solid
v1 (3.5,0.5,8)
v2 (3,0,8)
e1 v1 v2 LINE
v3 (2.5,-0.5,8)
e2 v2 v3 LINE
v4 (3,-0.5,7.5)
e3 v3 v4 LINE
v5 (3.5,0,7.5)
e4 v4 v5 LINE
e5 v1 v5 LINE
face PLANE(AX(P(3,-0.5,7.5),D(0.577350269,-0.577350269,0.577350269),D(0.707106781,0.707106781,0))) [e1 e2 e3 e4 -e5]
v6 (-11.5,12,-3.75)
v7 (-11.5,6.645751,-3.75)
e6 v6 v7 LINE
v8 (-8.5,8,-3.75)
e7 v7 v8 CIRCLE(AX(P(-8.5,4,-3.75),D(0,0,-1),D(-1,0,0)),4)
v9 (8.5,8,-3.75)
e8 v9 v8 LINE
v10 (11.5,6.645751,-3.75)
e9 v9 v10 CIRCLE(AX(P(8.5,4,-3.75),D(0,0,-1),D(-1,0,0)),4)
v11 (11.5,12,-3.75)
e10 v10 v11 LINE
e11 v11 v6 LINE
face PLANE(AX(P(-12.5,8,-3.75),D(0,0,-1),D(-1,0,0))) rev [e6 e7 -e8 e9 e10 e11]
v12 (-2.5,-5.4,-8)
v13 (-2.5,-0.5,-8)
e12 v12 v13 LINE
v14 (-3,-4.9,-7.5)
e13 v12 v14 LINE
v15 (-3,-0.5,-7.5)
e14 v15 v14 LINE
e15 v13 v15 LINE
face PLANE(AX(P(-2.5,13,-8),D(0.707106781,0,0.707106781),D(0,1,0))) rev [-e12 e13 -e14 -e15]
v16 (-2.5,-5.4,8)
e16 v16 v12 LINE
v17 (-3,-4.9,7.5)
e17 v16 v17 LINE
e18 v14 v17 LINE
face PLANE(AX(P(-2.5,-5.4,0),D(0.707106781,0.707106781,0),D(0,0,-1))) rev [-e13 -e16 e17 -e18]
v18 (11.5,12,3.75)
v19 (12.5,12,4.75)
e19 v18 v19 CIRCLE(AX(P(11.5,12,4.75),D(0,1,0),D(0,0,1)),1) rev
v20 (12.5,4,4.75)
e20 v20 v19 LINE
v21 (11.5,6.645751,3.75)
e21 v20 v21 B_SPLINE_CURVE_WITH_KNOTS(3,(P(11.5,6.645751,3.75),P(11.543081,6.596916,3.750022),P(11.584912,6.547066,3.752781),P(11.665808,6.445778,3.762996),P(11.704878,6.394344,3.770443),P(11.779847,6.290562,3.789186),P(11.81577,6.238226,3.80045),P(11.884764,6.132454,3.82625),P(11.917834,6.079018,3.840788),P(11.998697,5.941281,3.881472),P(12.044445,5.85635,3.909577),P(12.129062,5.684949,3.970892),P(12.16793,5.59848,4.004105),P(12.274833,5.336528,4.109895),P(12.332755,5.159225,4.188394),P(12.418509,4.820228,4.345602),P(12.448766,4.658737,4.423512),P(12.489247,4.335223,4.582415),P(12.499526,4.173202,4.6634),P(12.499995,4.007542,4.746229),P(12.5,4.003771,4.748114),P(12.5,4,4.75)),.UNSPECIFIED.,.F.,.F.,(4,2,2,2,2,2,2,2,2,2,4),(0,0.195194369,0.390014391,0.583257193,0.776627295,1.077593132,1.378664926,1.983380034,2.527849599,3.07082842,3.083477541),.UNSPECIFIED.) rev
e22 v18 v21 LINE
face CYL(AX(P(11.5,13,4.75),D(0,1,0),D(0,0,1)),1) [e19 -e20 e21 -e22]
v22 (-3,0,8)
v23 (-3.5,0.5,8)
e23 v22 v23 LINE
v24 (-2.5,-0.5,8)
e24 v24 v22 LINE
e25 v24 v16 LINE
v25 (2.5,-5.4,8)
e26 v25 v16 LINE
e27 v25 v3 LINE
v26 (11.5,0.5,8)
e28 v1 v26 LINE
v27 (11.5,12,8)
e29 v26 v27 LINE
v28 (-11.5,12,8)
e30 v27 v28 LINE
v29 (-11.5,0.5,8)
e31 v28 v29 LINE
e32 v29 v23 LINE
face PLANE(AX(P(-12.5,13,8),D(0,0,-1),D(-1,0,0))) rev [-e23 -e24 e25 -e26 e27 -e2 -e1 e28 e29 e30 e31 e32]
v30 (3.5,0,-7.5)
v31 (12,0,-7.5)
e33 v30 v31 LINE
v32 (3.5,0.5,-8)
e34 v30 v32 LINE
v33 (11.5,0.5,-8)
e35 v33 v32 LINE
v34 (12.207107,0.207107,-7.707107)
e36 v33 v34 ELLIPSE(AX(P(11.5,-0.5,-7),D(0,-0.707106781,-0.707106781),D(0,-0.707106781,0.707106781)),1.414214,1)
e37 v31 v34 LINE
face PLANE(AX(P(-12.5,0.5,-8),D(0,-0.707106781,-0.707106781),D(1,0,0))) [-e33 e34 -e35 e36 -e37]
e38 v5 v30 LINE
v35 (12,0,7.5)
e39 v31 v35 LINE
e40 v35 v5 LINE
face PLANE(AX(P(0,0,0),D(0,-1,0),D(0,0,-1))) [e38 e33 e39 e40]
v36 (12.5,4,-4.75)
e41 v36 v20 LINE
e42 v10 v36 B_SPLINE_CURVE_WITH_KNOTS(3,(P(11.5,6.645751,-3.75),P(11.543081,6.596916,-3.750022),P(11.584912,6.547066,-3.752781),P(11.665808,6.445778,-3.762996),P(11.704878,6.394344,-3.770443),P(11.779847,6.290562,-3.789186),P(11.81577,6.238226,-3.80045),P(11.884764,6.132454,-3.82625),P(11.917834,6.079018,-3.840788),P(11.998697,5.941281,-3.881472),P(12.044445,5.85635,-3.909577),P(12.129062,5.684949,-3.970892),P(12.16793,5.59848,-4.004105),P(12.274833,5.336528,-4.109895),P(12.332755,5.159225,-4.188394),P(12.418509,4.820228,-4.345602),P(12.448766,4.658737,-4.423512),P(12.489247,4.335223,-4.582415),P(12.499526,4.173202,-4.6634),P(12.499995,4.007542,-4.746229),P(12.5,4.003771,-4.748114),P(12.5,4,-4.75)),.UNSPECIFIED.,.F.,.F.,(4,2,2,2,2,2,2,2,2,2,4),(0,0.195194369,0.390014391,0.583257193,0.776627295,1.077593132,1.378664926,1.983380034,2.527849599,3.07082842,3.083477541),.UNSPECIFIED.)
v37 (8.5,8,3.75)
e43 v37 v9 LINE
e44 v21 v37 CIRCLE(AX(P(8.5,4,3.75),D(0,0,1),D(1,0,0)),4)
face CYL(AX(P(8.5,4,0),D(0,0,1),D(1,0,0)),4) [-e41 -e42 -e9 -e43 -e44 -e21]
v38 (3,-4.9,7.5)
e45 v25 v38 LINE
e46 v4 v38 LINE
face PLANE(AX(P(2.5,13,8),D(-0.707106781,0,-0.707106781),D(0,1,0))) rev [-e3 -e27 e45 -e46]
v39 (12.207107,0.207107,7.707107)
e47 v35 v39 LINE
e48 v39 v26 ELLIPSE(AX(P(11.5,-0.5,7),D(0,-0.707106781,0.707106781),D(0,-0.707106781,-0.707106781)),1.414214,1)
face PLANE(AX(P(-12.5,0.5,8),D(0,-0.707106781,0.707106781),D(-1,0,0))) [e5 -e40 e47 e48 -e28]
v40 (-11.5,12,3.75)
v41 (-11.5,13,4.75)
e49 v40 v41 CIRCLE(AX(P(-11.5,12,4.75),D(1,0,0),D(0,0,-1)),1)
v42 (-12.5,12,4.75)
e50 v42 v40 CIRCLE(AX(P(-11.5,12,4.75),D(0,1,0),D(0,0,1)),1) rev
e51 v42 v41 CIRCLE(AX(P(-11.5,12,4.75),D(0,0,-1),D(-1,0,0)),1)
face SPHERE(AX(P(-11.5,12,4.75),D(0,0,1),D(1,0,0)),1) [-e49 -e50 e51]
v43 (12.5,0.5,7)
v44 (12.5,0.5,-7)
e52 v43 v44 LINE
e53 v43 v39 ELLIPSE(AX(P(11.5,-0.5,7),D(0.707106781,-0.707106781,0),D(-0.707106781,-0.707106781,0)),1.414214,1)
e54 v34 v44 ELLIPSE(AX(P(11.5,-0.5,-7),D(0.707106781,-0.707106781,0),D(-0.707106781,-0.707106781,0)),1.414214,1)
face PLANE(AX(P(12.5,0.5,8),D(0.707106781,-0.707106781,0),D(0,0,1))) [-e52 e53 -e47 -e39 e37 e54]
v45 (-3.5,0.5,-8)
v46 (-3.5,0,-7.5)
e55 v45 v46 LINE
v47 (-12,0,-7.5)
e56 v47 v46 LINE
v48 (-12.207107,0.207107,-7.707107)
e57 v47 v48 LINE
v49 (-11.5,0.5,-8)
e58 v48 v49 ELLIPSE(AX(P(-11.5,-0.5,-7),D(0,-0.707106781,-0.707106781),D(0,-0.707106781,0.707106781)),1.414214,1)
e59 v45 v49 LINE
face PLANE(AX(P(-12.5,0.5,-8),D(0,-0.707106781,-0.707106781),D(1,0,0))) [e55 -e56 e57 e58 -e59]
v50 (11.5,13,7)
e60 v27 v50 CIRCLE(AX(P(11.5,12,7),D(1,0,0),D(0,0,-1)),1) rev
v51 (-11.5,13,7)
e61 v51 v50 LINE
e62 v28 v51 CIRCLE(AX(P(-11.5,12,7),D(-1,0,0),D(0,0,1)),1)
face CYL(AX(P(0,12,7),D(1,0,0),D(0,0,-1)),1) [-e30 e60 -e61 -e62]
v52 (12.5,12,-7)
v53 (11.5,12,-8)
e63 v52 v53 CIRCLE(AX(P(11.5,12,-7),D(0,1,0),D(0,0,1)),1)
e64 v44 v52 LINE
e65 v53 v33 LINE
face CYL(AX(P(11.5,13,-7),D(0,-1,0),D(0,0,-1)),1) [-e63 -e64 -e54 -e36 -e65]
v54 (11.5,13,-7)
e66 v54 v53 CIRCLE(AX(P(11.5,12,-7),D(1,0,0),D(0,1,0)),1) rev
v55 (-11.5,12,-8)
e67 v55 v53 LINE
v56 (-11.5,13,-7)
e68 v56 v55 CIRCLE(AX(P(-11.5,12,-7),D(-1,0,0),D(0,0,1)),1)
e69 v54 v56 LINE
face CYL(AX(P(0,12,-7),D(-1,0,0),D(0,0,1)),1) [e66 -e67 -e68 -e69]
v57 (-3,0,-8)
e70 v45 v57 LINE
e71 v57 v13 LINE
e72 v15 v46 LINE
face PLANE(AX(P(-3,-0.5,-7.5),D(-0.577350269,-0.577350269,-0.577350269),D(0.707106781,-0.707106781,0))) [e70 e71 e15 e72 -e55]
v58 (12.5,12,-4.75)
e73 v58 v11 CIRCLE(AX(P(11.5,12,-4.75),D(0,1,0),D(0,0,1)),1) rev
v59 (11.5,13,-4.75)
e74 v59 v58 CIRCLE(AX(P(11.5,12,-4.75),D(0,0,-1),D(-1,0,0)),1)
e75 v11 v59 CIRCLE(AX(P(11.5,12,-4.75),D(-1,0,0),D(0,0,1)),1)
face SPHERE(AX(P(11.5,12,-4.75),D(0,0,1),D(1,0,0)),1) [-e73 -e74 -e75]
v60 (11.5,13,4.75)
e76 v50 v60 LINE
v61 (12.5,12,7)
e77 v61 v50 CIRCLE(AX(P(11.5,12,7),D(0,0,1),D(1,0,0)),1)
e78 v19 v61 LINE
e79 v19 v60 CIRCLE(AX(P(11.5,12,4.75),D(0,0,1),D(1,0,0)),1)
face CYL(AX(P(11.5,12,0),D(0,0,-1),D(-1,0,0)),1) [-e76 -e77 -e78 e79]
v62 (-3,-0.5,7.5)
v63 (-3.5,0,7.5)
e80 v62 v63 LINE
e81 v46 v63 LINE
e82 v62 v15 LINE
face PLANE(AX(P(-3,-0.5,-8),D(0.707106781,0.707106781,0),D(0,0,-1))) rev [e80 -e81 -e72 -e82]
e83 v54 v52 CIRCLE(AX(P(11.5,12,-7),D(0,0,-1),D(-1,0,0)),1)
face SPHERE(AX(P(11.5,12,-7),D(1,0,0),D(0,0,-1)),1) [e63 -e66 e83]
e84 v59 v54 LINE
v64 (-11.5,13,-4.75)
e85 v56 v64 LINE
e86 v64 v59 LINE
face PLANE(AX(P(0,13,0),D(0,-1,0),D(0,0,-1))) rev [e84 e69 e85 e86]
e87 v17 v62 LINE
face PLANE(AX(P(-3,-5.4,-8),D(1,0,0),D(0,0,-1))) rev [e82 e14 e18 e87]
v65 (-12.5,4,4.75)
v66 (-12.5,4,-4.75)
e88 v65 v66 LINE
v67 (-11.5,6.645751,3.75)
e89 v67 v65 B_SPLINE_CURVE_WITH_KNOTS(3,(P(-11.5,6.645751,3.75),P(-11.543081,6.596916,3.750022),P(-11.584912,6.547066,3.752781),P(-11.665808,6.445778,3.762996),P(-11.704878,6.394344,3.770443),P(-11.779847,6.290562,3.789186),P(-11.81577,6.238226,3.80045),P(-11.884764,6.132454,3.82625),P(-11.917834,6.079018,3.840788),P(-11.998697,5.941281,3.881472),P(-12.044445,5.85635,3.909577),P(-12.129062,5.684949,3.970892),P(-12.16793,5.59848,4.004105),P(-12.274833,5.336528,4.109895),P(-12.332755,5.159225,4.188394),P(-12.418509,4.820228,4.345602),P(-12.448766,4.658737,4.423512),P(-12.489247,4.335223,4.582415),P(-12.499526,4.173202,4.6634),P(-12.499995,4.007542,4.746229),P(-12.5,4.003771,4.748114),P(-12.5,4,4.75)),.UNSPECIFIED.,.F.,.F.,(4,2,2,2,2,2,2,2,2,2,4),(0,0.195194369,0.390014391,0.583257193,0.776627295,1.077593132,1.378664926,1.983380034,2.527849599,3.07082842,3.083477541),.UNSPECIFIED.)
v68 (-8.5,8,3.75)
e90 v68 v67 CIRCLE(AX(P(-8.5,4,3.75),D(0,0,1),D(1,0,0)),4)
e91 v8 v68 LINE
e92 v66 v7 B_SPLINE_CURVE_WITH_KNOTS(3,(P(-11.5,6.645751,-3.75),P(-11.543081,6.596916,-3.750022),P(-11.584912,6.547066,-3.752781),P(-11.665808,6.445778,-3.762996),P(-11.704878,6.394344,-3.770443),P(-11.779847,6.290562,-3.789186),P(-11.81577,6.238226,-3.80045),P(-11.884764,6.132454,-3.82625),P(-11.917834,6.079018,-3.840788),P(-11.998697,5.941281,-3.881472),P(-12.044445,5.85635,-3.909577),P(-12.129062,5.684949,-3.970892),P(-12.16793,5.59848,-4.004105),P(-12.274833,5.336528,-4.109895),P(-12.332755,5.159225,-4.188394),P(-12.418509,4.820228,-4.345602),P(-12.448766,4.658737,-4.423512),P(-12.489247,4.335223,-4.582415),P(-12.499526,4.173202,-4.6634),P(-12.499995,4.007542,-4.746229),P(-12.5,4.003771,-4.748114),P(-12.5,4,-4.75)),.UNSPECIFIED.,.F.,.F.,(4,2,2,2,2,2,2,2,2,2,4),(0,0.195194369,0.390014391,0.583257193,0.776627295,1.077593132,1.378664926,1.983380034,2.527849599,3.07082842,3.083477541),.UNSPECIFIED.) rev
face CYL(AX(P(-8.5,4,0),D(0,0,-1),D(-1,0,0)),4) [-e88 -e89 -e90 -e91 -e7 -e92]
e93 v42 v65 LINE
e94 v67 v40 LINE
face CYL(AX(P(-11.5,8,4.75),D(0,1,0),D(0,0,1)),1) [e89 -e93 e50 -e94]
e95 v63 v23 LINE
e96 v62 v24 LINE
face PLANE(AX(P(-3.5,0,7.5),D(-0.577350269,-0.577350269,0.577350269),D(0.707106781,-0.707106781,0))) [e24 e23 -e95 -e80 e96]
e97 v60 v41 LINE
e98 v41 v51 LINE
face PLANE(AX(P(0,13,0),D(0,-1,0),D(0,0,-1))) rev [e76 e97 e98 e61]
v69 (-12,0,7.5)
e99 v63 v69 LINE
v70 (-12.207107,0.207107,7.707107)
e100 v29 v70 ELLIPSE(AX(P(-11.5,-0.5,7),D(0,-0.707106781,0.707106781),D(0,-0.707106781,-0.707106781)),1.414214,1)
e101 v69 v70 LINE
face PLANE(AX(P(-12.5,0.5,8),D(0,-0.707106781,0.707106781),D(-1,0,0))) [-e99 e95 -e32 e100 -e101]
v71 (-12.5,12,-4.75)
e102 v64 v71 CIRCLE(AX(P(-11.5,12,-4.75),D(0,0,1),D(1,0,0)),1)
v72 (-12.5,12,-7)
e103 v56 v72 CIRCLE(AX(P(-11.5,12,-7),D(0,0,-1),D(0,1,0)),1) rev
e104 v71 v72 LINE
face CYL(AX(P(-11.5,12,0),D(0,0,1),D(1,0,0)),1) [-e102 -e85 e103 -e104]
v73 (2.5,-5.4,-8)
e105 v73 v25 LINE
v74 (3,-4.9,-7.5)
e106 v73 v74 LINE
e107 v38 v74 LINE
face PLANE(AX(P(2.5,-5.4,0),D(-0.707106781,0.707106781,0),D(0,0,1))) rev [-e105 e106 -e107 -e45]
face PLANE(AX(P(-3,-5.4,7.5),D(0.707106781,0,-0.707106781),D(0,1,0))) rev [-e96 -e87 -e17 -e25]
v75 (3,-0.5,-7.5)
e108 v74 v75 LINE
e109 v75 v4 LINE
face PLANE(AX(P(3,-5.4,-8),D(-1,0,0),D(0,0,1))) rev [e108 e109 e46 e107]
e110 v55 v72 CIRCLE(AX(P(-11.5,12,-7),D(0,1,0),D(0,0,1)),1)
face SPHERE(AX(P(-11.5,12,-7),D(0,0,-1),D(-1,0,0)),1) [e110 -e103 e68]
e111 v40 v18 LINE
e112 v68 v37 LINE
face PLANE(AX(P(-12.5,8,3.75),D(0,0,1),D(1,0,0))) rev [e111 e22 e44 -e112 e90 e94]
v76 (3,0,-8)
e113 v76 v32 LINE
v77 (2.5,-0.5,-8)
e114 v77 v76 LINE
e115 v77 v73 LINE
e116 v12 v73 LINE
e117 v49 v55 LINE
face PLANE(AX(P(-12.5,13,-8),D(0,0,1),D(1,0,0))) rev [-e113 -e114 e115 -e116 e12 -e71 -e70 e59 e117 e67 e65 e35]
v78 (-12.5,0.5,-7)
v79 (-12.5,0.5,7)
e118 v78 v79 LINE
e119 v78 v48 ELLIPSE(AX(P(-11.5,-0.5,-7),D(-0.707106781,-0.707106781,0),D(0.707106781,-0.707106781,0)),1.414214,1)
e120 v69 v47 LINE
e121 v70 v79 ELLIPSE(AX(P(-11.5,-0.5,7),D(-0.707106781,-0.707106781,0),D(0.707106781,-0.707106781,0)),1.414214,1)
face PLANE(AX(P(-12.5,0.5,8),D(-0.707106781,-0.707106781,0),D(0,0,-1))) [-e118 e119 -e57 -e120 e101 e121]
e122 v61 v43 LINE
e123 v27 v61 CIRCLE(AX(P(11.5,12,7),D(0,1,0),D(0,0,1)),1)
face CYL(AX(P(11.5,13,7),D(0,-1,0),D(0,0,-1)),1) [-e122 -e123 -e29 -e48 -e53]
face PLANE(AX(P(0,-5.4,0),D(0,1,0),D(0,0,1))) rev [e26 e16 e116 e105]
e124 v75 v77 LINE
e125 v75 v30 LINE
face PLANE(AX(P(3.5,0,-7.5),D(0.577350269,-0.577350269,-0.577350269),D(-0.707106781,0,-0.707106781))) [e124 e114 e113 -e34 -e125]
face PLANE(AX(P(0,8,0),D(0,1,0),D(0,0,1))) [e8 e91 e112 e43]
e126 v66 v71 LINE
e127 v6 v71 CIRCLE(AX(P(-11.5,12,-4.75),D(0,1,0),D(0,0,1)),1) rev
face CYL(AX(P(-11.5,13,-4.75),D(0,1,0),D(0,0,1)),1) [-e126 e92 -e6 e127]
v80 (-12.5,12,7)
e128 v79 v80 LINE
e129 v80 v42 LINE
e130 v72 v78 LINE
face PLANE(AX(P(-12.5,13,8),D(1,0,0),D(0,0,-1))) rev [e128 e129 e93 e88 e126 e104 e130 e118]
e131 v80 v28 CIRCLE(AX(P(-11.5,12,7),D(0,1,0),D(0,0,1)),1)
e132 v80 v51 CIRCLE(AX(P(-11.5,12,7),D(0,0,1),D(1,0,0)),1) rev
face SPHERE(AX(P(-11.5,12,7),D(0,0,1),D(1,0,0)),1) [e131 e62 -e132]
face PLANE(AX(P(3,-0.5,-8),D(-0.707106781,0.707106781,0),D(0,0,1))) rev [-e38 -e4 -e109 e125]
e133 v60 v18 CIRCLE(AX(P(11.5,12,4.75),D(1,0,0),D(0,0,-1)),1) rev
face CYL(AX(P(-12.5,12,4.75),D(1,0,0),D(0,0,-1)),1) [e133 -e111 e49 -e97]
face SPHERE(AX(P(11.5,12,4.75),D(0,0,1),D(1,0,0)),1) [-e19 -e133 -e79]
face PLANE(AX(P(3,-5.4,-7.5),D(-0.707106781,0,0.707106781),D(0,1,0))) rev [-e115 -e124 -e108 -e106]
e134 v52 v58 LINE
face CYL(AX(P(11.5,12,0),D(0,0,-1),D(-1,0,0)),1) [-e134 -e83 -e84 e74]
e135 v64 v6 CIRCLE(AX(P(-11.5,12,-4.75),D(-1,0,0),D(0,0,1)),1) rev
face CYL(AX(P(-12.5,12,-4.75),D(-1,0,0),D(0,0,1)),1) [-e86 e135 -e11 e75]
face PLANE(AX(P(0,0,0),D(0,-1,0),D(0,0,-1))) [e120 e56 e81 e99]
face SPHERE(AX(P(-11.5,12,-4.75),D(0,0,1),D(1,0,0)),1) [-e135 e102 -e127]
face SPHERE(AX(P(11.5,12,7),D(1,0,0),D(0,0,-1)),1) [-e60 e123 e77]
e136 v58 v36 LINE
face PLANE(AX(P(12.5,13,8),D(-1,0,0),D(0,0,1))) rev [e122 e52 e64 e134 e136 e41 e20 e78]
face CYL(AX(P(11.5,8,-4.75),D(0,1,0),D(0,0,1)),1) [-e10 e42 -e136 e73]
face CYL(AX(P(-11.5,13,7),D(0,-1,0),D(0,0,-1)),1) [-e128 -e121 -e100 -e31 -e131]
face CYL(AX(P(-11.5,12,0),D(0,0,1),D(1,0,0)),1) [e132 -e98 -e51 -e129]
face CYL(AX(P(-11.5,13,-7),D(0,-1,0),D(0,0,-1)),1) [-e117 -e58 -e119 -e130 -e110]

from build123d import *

# Parameters (mm, degrees)
SKIZZE1_W                       = 25
SKIZZE1_H                       = 16
AUFSATZ_LINEAR_AUSTRAGEN1_DEPTH = 13
SKIZZE2_W                       = 25
SKIZZE2_H                       = 7.5
SCHNITT_LINEAR_AUSTRAGEN1_DEPTH = 5
SKIZZE3_W                       = 6
SKIZZE3_H                       = 16
AUFSATZ_LINEAR_AUSTRAGEN2_DEPTH = 5.4
VERRUNDUNG1_R                   = 1
FASE1_SIZE                      = 0.5
VERRUNDUNG2_R                   = 4
VERRUNDUNG3_R                   = 1


with BuildPart() as part:
    # Skizze1 → Aufsatz-Linear austragen1 (new body)
    with BuildSketch(Plane(origin=(0, 0, 0), x_dir=(1, 0, 0), z_dir=(0, 1, 0))):
        Rectangle(SKIZZE1_W, SKIZZE1_H)
    extrude(amount=AUFSATZ_LINEAR_AUSTRAGEN1_DEPTH)

    # Skizze2 → Schnitt-Linear austragen1 (cut)
    with BuildSketch(Plane(origin=(0, 13, 0), x_dir=(1, 0, 0), z_dir=(0, 1, 0))):
        Rectangle(SKIZZE2_W, SKIZZE2_H)
    extrude(amount=-SCHNITT_LINEAR_AUSTRAGEN1_DEPTH, mode=Mode.SUBTRACT)

    # Skizze3 → Aufsatz-Linear austragen2 (add)
    with BuildSketch(Plane.XZ):
        Rectangle(SKIZZE3_W, SKIZZE3_H)
    extrude(amount=AUFSATZ_LINEAR_AUSTRAGEN2_DEPTH)

    # Verrundung1
    verrundung1_edges = [part.edges().sort_by_distance(p)[0] for p in [
        (12.5, 10.5, -3.75),
        (12.5, 10.5, 3.75),
        (-12.5, 10.5, 3.75),
        (-12.5, 10.5, -3.75),
        (0, 13, -3.75),
        (0, 13, 3.75),
    ]]
    fillet(verrundung1_edges, radius=VERRUNDUNG1_R)

    # Fase1
    fase1_edges = [part.edges().sort_by_distance(p)[0] for p in [
        (7.75, 0, 8),
        (-7.75, 0, -8),
        (3, 0, 0),
        (3, -2.7, -8),
        (3, -2.7, 8),
        (-3, 0, 0),
        (-3, -2.7, 8),
        (-3, -2.7, -8),
        (3, -5.4, 0),
        (-3, -5.4, 0),
        (-7.75, 0, 8),
        (-12.5, 0, 0),
        (7.75, 0, -8),
        (12.5, 0, 0),
    ]]
    chamfer(fase1_edges, length=FASE1_SIZE)

    # Verrundung2
    verrundung2_edges = [part.edges().sort_by_distance(p)[0] for p in [
        (12.5, 8, 0),
        (-12.5, 8, 0),
    ]]
    fillet(verrundung2_edges, radius=VERRUNDUNG2_R)

    # Verrundung3
    # the kernel refuses this fillet: 1 mm, written as the material it takes off along each edge
    with BuildSketch(Plane(origin=(-11.5, 12, 4.75), x_dir=(0, 1, 0), z_dir=(-1, 0, 0))) as verrundung3_piece_1_section:
        Polygon((0, 0), (VERRUNDUNG3_R, 0), (VERRUNDUNG3_R, VERRUNDUNG3_R), (0, VERRUNDUNG3_R), align=None)
    verrundung3_piece_1 = extrude(amount=VERRUNDUNG3_R, mode=Mode.PRIVATE)
    verrundung3_piece_1 = verrundung3_piece_1 - Plane(origin=(-11.5, 12, 4.75), x_dir=(0, -0.7071067811865475, 0.7071067811865475), z_dir=(-1, 0, 0)) * Sphere(VERRUNDUNG3_R, mode=Mode.PRIVATE)
    add(verrundung3_piece_1, mode=Mode.SUBTRACT)
    with BuildSketch(Plane(origin=(11.5, 12, 4.75), x_dir=(1, 0, 0), z_dir=(0, 1, 0))) as verrundung3_piece_2_section:
        Polygon((0, 0), (VERRUNDUNG3_R, 0), (VERRUNDUNG3_R, VERRUNDUNG3_R), (0, VERRUNDUNG3_R), align=None)
    verrundung3_piece_2 = extrude(amount=VERRUNDUNG3_R, mode=Mode.PRIVATE)
    verrundung3_piece_2 = verrundung3_piece_2 - Plane(origin=(11.5, 12, 4.75), x_dir=(-0.7071067811865475, 0, 0.7071067811865475), z_dir=(0, 1, 0)) * Sphere(VERRUNDUNG3_R, mode=Mode.PRIVATE)
    add(verrundung3_piece_2, mode=Mode.SUBTRACT)
    with BuildSketch(Plane(origin=(-11.5, 12, -4.75), x_dir=(0, 1, 0), z_dir=(-1, 0, 0))) as verrundung3_piece_3_section:
        Polygon((0, 0), (VERRUNDUNG3_R, 0), (VERRUNDUNG3_R, -VERRUNDUNG3_R), (0, -VERRUNDUNG3_R), align=None)
    verrundung3_piece_3 = extrude(amount=VERRUNDUNG3_R, mode=Mode.PRIVATE)
    verrundung3_piece_3 = verrundung3_piece_3 - Plane(origin=(-11.5, 12, -4.75), x_dir=(0, -0.7071067811865475, -0.7071067811865475), z_dir=(-1, 0, 0)) * Sphere(VERRUNDUNG3_R, mode=Mode.PRIVATE)
    add(verrundung3_piece_3, mode=Mode.SUBTRACT)
    with BuildSketch(Plane(origin=(11.5, 12, -4.75), x_dir=(1, 0, 0), z_dir=(0, 1, 0))) as verrundung3_piece_4_section:
        Polygon((0, 0), (VERRUNDUNG3_R, 0), (VERRUNDUNG3_R, -VERRUNDUNG3_R), (0, -VERRUNDUNG3_R), align=None)
    verrundung3_piece_4 = extrude(amount=VERRUNDUNG3_R, mode=Mode.PRIVATE)
    verrundung3_piece_4 = verrundung3_piece_4 - Plane(origin=(11.5, 12, -4.75), x_dir=(-0.7071067811865475, 0, -0.7071067811865475), z_dir=(0, 1, 0)) * Sphere(VERRUNDUNG3_R, mode=Mode.PRIVATE)
    add(verrundung3_piece_4, mode=Mode.SUBTRACT)
    with BuildSketch(Plane(origin=(-11.5, 12, -7), x_dir=(0, 0, -1), z_dir=(-1, 0, 0))) as verrundung3_piece_5_section:
        Polygon((0, 0), (VERRUNDUNG3_R, 0), (VERRUNDUNG3_R, -VERRUNDUNG3_R), (0, -VERRUNDUNG3_R), align=None)
    verrundung3_piece_5 = extrude(amount=VERRUNDUNG3_R, mode=Mode.PRIVATE)
    verrundung3_piece_5 = verrundung3_piece_5 - Plane(origin=(-11.5, 12, -7), x_dir=(0, -0.7071067811865475, 0.7071067811865475), z_dir=(-1, 0, 0)) * Sphere(VERRUNDUNG3_R, mode=Mode.PRIVATE)
    add(verrundung3_piece_5, mode=Mode.SUBTRACT)
    with BuildSketch(Plane(origin=(-11.5, 12, 7), x_dir=(0, 1, 0), z_dir=(-1, 0, 0))) as verrundung3_piece_6_section:
        Polygon((0, 0), (VERRUNDUNG3_R, 0), (VERRUNDUNG3_R, -VERRUNDUNG3_R), (0, -VERRUNDUNG3_R), align=None)
    verrundung3_piece_6 = extrude(amount=VERRUNDUNG3_R, mode=Mode.PRIVATE)
    verrundung3_piece_6 = verrundung3_piece_6 - Plane(origin=(-11.5, 12, 7), x_dir=(0, -0.7071067811865475, -0.7071067811865475), z_dir=(-1, 0, 0)) * Sphere(VERRUNDUNG3_R, mode=Mode.PRIVATE)
    add(verrundung3_piece_6, mode=Mode.SUBTRACT)
    with BuildSketch(Plane(origin=(11.5, 12, 7), x_dir=(0, 1, 0), z_dir=(1, 0, 0))) as verrundung3_piece_7_section:
        Polygon((0, 0), (VERRUNDUNG3_R, 0), (VERRUNDUNG3_R, VERRUNDUNG3_R), (0, VERRUNDUNG3_R), align=None)
    verrundung3_piece_7 = extrude(amount=VERRUNDUNG3_R, mode=Mode.PRIVATE)
    verrundung3_piece_7 = verrundung3_piece_7 - Plane(origin=(11.5, 12, 7), x_dir=(0, -0.7071067811865475, -0.7071067811865475), z_dir=(1, 0, 0)) * Sphere(VERRUNDUNG3_R, mode=Mode.PRIVATE)
    add(verrundung3_piece_7, mode=Mode.SUBTRACT)
    with BuildSketch(Plane(origin=(11.5, 12, -7), x_dir=(1, 0, 0), z_dir=(0, 0, -1))) as verrundung3_piece_8_section:
        Polygon((0, 0), (VERRUNDUNG3_R, 0), (VERRUNDUNG3_R, -VERRUNDUNG3_R), (0, -VERRUNDUNG3_R), align=None)
    verrundung3_piece_8 = extrude(amount=VERRUNDUNG3_R, mode=Mode.PRIVATE)
    verrundung3_piece_8 = verrundung3_piece_8 - Plane(origin=(11.5, 12, -7), x_dir=(-0.7071067811865475, -0.7071067811865475, 0), z_dir=(0, 0, -1)) * Sphere(VERRUNDUNG3_R, mode=Mode.PRIVATE)
    add(verrundung3_piece_8, mode=Mode.SUBTRACT)
    with BuildSketch(Plane(origin=(-12.5, 13, -7), x_dir=(0, -1, 0), z_dir=(0, 0, 1)), Plane(origin=(-12.5, 13, 4.75), x_dir=(0, -1, 0), z_dir=(0, 0, 1))) as verrundung3_piece_9:
        with BuildLine():
            CenterArc((VERRUNDUNG3_R, VERRUNDUNG3_R), VERRUNDUNG3_R, 180, 90)
            Line((0, VERRUNDUNG3_R), (0, 0))
            Line((0, 0), (VERRUNDUNG3_R, 0))
        make_face()
    extrude(amount=2.25, mode=Mode.SUBTRACT)
    with BuildSketch(Plane(origin=(-11.5, 13, 8), x_dir=(0, 0, -1), z_dir=(1, 0, 0)), Plane(origin=(11.5, 13, -8), x_dir=(0, 0, 1), z_dir=(-1, 0, 0))) as verrundung3_piece_10:
        with BuildLine():
            CenterArc((VERRUNDUNG3_R, -VERRUNDUNG3_R), VERRUNDUNG3_R, 90, 90)
            Line((0, -VERRUNDUNG3_R), (0, 0))
            Line((0, 0), (VERRUNDUNG3_R, 0))
        make_face()
    extrude(amount=23, mode=Mode.SUBTRACT)
    with BuildSketch(Plane(origin=(12.5, 13, 7), x_dir=(-1, 0, 0), z_dir=(0, 0, -1)), Plane(origin=(12.5, 13, -4.75), x_dir=(-1, 0, 0), z_dir=(0, 0, -1))) as verrundung3_piece_11:
        with BuildLine():
            CenterArc((VERRUNDUNG3_R, -VERRUNDUNG3_R), VERRUNDUNG3_R, 90, 90)
            Line((0, -VERRUNDUNG3_R), (0, 0))
            Line((0, 0), (VERRUNDUNG3_R, 0))
        make_face()
    extrude(amount=2.25, mode=Mode.SUBTRACT)
    with BuildSketch(Plane(origin=(12.5, -2, 8), x_dir=(-1, 0, 0), z_dir=(0, 1, 0)), Plane(origin=(-12.5, -2, 8), x_dir=(0, 0, -1), z_dir=(0, 1, 0))) as verrundung3_piece_12:
        with BuildLine():
            CenterArc((VERRUNDUNG3_R, -VERRUNDUNG3_R), VERRUNDUNG3_R, 90, 90)
            Line((0, -VERRUNDUNG3_R), (0, 0))
            Line((0, 0), (VERRUNDUNG3_R, 0))
        make_face()
    extrude(amount=14, mode=Mode.SUBTRACT)
    with BuildSketch(Plane(origin=(-12.5, -2, -8), x_dir=(0, 0, 1), z_dir=(0, 1, 0)), Plane(origin=(12.5, -2, -8), x_dir=(-1, 0, 0), z_dir=(0, 1, 0))) as verrundung3_piece_13:
        with BuildLine():
            CenterArc((VERRUNDUNG3_R, VERRUNDUNG3_R), VERRUNDUNG3_R, 180, 90)
            Line((0, VERRUNDUNG3_R), (0, 0))
            Line((0, 0), (VERRUNDUNG3_R, 0))
        make_face()
    extrude(amount=14, mode=Mode.SUBTRACT)


solid = part.part
